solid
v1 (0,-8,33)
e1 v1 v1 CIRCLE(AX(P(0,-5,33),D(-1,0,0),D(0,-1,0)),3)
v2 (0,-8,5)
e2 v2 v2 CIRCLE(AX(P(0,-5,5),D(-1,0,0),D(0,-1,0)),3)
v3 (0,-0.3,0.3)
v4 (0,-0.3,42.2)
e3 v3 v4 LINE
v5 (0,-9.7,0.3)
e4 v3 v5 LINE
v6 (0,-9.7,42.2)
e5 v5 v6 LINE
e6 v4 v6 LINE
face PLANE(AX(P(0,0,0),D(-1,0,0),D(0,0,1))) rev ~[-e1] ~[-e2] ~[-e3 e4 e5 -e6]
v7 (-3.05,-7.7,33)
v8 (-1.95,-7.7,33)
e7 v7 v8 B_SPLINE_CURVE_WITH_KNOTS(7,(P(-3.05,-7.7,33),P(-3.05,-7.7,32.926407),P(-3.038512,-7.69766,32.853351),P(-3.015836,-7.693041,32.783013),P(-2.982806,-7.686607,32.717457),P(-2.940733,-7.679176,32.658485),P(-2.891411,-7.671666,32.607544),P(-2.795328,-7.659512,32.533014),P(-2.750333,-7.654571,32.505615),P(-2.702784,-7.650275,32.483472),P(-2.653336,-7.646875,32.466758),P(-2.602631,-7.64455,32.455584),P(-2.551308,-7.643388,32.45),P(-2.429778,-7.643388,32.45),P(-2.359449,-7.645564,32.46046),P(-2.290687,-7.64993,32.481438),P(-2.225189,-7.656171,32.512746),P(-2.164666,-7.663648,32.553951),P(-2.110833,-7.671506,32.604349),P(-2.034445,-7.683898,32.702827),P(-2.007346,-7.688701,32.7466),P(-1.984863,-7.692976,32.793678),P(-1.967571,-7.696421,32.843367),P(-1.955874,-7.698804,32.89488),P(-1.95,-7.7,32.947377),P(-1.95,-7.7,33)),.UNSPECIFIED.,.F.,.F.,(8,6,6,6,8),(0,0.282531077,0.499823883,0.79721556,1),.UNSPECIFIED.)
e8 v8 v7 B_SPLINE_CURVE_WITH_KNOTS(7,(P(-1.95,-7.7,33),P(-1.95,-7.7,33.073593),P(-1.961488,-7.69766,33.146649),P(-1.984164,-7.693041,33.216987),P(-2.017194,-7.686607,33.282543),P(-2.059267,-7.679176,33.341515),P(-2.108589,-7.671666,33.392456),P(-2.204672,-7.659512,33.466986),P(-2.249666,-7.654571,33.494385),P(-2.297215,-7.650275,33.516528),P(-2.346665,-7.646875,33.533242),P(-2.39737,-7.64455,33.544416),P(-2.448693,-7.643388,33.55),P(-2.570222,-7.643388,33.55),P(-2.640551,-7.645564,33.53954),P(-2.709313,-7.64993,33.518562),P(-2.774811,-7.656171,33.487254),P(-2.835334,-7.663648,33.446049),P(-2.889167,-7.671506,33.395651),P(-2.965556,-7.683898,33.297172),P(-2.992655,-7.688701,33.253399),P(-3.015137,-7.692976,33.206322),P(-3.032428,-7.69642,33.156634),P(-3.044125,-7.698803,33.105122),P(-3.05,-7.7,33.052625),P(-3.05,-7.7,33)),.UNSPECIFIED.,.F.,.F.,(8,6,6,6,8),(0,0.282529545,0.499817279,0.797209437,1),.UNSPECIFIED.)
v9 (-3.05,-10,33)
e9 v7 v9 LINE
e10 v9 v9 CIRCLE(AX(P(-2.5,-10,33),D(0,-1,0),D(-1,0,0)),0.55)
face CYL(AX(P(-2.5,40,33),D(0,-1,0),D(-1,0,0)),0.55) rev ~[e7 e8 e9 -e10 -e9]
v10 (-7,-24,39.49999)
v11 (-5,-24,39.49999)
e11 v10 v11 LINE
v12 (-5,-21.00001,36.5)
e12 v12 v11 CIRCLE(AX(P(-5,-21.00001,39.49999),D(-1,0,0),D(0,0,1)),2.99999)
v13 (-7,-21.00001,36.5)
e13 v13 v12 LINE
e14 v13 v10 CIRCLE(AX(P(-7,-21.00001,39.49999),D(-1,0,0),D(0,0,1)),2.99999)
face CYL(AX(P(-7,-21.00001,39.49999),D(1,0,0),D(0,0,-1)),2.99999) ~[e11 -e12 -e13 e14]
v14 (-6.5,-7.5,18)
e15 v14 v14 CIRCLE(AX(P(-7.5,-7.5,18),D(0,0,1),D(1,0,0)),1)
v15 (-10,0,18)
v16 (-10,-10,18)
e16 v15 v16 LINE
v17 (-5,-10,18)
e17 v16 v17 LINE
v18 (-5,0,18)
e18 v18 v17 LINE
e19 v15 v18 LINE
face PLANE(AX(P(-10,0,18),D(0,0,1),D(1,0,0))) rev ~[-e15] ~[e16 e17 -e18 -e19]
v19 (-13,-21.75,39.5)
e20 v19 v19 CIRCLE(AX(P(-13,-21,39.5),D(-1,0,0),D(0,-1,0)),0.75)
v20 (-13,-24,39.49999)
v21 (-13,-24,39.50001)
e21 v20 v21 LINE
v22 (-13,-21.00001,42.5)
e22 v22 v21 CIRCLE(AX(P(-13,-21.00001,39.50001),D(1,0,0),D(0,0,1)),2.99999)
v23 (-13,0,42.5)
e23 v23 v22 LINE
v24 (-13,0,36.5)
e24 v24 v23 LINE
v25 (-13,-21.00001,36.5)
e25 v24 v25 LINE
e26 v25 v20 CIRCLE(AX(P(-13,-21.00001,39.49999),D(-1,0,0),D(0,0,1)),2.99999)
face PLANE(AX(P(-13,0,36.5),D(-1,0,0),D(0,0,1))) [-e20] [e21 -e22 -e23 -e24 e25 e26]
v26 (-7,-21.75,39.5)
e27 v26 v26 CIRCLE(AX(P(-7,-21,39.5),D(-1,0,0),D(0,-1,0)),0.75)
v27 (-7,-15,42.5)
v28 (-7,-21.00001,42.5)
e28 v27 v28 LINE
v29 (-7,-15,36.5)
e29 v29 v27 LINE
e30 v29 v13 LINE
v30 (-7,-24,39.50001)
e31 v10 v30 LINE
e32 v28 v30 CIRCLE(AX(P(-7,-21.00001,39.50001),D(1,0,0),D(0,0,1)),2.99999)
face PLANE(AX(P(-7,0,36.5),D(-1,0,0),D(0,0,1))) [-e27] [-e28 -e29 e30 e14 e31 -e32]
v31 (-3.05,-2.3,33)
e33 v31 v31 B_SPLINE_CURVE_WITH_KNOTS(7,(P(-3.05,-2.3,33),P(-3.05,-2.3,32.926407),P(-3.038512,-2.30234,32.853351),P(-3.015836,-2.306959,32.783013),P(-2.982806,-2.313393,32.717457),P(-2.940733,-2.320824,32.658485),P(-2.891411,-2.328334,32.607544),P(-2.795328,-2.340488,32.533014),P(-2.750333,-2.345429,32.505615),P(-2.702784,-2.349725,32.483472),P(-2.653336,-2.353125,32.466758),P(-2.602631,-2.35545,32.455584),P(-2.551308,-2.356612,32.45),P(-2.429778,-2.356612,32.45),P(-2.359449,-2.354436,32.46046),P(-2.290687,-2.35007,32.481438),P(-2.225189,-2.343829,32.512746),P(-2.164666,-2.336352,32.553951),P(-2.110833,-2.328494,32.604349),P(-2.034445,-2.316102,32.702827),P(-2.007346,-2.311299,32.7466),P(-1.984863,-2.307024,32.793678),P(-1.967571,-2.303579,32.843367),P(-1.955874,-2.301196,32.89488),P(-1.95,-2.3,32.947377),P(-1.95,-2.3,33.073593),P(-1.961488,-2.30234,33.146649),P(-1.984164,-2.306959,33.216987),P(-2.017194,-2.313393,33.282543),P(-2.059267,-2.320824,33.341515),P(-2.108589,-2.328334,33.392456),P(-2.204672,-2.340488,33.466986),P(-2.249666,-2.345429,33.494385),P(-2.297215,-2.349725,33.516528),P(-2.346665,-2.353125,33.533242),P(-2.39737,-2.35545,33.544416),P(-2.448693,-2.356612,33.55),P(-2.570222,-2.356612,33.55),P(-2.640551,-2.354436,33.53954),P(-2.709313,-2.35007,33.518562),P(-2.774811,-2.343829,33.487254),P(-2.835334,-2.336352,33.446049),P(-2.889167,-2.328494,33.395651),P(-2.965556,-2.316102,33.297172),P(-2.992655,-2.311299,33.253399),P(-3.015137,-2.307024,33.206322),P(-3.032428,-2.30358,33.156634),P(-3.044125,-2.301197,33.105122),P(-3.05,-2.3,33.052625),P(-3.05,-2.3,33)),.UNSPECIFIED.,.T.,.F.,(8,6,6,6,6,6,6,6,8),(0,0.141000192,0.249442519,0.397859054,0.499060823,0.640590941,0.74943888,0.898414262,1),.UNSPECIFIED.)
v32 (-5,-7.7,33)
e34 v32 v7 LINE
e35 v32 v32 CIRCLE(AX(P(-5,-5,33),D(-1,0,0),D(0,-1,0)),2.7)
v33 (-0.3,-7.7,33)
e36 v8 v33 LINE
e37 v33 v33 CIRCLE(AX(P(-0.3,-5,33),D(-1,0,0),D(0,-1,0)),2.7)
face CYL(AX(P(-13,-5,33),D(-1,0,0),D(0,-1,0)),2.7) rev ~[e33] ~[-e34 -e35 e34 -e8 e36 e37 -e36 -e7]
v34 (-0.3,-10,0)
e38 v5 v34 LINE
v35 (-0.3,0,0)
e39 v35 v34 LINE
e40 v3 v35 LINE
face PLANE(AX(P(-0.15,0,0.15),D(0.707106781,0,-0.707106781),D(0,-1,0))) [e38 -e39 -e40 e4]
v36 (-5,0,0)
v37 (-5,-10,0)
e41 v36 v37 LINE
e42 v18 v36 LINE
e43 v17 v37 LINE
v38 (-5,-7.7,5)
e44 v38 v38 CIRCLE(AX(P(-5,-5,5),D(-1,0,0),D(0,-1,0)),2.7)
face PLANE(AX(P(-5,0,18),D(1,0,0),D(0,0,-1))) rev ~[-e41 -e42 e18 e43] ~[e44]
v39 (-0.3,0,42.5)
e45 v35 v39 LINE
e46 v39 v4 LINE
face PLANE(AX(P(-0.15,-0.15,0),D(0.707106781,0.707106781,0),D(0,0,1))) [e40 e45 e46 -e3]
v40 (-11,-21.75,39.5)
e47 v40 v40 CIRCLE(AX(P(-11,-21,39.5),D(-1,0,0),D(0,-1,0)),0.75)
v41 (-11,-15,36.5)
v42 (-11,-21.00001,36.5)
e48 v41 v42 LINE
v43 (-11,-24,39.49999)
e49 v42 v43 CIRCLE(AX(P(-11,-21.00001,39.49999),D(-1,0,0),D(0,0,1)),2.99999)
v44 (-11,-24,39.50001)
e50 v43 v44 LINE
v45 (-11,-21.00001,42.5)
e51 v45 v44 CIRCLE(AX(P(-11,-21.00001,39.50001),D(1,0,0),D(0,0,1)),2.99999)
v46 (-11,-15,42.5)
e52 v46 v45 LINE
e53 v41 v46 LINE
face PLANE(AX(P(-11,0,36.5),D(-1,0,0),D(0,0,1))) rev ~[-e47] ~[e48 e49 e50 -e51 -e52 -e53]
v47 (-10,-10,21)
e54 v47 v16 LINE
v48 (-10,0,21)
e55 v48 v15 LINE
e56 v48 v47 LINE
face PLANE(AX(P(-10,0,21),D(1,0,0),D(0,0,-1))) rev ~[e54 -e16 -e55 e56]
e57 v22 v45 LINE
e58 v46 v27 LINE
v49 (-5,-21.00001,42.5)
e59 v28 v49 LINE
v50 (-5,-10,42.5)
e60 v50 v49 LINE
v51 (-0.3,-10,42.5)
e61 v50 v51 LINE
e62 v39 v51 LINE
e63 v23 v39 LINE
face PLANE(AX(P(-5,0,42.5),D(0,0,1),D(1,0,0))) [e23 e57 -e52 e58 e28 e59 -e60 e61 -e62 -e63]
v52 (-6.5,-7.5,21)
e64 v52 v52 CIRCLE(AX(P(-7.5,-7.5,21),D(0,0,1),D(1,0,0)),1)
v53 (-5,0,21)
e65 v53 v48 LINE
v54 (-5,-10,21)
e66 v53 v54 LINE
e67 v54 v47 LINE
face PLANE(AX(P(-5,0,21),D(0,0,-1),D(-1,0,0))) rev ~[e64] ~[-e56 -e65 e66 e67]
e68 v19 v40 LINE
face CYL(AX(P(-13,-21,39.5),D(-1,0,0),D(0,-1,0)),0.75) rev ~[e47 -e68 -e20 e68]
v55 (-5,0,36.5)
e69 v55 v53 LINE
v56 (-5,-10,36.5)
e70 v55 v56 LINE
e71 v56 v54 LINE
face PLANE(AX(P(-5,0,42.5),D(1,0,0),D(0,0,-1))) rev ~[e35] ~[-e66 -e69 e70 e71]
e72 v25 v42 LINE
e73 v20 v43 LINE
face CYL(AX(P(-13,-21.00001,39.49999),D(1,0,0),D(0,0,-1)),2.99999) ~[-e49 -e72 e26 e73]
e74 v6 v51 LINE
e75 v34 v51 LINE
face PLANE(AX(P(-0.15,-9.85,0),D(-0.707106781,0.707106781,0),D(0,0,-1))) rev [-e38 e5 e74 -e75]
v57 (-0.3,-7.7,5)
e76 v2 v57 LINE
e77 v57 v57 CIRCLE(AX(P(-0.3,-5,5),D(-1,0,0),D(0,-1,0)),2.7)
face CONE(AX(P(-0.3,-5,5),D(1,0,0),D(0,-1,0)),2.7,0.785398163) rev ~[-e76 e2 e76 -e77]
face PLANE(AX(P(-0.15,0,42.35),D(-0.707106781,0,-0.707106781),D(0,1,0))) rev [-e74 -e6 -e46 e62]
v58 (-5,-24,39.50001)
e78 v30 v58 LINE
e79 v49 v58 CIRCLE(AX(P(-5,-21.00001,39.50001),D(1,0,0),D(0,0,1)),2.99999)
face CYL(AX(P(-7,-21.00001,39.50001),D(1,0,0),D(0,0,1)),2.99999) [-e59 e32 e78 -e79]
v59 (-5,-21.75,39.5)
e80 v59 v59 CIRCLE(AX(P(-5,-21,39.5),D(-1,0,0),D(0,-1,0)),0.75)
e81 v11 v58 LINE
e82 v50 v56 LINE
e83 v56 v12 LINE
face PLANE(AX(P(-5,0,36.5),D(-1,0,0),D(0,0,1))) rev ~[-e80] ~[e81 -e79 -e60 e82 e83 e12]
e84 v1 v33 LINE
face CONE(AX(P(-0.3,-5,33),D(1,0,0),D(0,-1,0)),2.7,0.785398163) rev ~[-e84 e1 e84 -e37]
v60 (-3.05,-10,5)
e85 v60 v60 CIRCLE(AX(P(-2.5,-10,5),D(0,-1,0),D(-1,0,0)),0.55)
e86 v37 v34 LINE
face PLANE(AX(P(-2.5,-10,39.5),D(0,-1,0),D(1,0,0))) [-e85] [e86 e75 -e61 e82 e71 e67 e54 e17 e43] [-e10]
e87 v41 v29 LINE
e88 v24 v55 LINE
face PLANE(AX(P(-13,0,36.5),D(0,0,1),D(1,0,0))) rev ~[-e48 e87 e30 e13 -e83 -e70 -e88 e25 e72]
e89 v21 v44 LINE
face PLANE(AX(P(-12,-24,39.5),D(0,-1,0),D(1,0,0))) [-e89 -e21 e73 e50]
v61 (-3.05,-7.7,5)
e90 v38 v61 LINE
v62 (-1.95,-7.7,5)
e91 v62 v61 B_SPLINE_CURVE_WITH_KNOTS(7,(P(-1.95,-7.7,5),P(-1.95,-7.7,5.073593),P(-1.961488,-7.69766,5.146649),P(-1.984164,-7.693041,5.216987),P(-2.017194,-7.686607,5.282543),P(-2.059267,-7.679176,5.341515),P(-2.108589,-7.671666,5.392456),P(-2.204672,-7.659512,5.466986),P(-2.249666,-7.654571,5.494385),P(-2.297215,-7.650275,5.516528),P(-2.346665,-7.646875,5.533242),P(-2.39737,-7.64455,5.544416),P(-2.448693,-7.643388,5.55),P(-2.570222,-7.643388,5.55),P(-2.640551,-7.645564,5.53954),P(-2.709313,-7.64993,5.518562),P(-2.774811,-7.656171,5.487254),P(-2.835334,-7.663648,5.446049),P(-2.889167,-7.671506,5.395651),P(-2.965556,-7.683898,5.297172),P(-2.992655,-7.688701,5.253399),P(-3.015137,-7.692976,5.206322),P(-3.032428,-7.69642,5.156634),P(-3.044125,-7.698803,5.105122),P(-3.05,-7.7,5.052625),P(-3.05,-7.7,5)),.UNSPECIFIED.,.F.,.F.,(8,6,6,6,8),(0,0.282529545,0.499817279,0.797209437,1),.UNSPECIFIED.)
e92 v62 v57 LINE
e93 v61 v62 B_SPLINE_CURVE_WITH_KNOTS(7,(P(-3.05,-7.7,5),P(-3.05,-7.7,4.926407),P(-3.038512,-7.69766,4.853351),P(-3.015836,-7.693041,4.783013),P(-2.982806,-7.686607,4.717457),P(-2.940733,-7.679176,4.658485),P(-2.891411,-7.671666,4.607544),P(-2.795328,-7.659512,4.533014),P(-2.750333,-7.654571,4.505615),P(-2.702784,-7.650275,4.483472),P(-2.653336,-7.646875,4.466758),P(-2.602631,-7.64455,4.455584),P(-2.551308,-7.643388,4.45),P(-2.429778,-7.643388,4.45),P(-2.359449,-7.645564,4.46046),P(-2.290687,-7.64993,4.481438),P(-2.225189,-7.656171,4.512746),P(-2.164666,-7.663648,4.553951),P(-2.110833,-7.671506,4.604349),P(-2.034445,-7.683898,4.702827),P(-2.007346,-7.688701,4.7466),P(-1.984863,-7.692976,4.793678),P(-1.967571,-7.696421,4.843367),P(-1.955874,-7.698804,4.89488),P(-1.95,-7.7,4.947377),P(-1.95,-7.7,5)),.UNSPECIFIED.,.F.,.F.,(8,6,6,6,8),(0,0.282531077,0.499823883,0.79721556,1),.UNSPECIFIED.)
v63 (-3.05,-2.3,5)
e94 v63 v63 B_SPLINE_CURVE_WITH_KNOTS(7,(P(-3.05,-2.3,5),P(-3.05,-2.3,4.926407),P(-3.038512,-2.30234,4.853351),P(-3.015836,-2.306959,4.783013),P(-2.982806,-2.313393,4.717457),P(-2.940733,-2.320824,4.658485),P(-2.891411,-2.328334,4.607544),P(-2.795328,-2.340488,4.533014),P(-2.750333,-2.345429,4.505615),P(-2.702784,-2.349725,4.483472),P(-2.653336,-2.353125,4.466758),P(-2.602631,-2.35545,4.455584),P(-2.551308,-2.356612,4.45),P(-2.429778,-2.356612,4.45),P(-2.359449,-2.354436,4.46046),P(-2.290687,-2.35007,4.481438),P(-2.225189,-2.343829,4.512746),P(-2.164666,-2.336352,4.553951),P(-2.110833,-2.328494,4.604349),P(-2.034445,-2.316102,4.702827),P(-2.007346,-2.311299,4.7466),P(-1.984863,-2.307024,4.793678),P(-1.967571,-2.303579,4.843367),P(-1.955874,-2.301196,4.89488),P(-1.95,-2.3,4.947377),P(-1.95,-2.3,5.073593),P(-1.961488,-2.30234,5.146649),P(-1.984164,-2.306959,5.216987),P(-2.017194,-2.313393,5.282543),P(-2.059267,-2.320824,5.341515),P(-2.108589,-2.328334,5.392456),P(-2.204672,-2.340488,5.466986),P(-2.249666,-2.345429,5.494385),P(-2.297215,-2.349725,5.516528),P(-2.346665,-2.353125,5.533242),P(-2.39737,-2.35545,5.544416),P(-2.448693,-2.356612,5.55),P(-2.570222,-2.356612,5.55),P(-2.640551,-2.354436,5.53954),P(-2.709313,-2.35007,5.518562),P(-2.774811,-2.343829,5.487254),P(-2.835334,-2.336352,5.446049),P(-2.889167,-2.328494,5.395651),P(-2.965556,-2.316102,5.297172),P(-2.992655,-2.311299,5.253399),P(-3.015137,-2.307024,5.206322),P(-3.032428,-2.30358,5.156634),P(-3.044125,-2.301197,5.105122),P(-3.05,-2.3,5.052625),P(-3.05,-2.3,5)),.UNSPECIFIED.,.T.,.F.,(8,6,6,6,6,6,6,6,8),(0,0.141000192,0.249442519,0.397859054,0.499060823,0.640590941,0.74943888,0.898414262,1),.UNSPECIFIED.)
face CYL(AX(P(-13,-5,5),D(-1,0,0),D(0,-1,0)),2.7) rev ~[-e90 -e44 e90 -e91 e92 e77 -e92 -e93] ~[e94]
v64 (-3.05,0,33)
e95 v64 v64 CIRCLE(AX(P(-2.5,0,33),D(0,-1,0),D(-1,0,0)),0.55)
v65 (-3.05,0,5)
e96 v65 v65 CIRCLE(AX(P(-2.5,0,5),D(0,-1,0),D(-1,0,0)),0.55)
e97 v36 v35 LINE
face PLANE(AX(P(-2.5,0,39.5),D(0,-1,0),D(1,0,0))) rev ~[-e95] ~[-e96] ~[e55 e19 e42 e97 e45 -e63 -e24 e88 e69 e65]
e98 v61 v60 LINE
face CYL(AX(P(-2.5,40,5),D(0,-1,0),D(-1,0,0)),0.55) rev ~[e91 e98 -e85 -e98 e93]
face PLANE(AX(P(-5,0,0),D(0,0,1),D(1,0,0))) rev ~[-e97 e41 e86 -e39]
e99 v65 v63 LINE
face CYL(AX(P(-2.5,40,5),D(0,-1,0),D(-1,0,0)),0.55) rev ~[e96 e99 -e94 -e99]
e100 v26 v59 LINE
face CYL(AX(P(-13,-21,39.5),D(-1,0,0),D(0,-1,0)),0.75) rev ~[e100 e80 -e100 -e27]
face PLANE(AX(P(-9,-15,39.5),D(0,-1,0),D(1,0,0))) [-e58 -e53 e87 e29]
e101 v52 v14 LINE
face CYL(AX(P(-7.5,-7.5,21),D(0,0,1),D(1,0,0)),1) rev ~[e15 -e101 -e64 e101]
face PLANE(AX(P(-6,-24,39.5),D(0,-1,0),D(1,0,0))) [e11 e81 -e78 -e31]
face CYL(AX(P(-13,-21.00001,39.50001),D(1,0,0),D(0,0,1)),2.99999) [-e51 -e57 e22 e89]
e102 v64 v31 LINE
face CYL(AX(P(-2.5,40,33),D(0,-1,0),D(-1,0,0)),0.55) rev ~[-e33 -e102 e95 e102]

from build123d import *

# Parameters (mm, degrees)
F0_W     = 4
F0_H     = 6
F1_DEPTH = 15
F0_W_2   = 2
F2_DEPTH = 24
F0_W_3   = 5
F3_DEPTH = 10
F4_R     = 2.99999
F5_R     = 2.7
F5_R_2   = 0.75
F6_DEPTH = 13.001
F7_D     = 1.1
F7_DEPTH = 40
F7_TIP   = 0.3304733405
F8_R     = 1
F9_DEPTH = 21.001
F10_SIZE = 0.3


# Not quite as in the source:
# - a fillet or chamfer is up to 0.001 mm smaller than in the source, because OpenCascade refuses the exact size


with BuildPart() as f1:
    # F0 (on Front) → F1 (new body)
    with BuildSketch(Plane.XZ):
        with Locations((-9, 39.5)):
            Rectangle(F0_W, F0_H)
    extrude(amount=F1_DEPTH)

    # F0 (on Front) → F2 (join)
    with BuildSketch(Plane.XZ):
        with Locations((-12, 39.5)):
            Rectangle(F0_W_2, F0_H)
        with Locations((-6, 39.5)):
            Rectangle(F0_W_2, F0_H)
    extrude(amount=F2_DEPTH)

    # F0 (on Front) → F3 (join)
    with BuildSketch(Plane.XZ):
        with Locations((-2.5, 39.5)):
            Rectangle(F0_W_3, F0_H)
        Polygon((0, 36.5), (-5, 36.5), (-5, 21), (-10, 21), (-10, 18), (-5, 18), (-5, 0), (0, 0), align=None)
    extrude(amount=F3_DEPTH)

    # F4 (radius 3 in the source; OpenCascade refuses exactly that, so slightly less here)
    f4_edges = [f1.edges().sort_by_distance(p)[0] for p in [
        (-6, -24, 42.5),
        (-6, -24, 36.5),
        (-12, -24, 42.5),
        (-12, -24, 36.5),
    ]]
    fillet(f4_edges, radius=F4_R)

    # F5 (on face) → F6 (cut, through all)
    with BuildSketch(Plane(origin=(-13, 0, 0), x_dir=(0, -1, 0), z_dir=(-1, 0, 0))):
        with Locations((5, 33)):
            Circle(F5_R)
        with Locations((5, 5)):
            Circle(F5_R)
        with Locations((21, 39.5)):
            Circle(F5_R_2)
    extrude(amount=-F6_DEPTH, mode=Mode.SUBTRACT)

    # F7
    with Locations(Plane(origin=(0, 0, 0), x_dir=(1, 0, 0), z_dir=(0, 1, 0))):
        with Locations((-2.5, -33), (-2.5, -5)):
            Hole(F7_D / 2, depth=F7_DEPTH)
            with Locations((0, 0, -(F7_DEPTH + F7_TIP / 2))):  # 118° drill point
                Cone(0, F7_D / 2, F7_TIP, mode=Mode.SUBTRACT)

    # F8 (on face) → F9 (cut, through all)
    with BuildSketch(Plane.XY.offset(21)):
        with Locations((-7.5, -7.5)):
            Circle(F8_R)
    extrude(amount=-F9_DEPTH, mode=Mode.SUBTRACT)

    # F10
    f10_edges = [f1.edges().sort_by_distance(p)[0] for p in [
        (0, -5, 0),
        (0, 0, 21.25),
        (0, -10, 21.25),
        (0, -5, 42.5),
        (0, -2.3, 5),
        (0, -2.3, 33),
    ]]
    chamfer(f10_edges, length=F10_SIZE)


solid = f1.part
